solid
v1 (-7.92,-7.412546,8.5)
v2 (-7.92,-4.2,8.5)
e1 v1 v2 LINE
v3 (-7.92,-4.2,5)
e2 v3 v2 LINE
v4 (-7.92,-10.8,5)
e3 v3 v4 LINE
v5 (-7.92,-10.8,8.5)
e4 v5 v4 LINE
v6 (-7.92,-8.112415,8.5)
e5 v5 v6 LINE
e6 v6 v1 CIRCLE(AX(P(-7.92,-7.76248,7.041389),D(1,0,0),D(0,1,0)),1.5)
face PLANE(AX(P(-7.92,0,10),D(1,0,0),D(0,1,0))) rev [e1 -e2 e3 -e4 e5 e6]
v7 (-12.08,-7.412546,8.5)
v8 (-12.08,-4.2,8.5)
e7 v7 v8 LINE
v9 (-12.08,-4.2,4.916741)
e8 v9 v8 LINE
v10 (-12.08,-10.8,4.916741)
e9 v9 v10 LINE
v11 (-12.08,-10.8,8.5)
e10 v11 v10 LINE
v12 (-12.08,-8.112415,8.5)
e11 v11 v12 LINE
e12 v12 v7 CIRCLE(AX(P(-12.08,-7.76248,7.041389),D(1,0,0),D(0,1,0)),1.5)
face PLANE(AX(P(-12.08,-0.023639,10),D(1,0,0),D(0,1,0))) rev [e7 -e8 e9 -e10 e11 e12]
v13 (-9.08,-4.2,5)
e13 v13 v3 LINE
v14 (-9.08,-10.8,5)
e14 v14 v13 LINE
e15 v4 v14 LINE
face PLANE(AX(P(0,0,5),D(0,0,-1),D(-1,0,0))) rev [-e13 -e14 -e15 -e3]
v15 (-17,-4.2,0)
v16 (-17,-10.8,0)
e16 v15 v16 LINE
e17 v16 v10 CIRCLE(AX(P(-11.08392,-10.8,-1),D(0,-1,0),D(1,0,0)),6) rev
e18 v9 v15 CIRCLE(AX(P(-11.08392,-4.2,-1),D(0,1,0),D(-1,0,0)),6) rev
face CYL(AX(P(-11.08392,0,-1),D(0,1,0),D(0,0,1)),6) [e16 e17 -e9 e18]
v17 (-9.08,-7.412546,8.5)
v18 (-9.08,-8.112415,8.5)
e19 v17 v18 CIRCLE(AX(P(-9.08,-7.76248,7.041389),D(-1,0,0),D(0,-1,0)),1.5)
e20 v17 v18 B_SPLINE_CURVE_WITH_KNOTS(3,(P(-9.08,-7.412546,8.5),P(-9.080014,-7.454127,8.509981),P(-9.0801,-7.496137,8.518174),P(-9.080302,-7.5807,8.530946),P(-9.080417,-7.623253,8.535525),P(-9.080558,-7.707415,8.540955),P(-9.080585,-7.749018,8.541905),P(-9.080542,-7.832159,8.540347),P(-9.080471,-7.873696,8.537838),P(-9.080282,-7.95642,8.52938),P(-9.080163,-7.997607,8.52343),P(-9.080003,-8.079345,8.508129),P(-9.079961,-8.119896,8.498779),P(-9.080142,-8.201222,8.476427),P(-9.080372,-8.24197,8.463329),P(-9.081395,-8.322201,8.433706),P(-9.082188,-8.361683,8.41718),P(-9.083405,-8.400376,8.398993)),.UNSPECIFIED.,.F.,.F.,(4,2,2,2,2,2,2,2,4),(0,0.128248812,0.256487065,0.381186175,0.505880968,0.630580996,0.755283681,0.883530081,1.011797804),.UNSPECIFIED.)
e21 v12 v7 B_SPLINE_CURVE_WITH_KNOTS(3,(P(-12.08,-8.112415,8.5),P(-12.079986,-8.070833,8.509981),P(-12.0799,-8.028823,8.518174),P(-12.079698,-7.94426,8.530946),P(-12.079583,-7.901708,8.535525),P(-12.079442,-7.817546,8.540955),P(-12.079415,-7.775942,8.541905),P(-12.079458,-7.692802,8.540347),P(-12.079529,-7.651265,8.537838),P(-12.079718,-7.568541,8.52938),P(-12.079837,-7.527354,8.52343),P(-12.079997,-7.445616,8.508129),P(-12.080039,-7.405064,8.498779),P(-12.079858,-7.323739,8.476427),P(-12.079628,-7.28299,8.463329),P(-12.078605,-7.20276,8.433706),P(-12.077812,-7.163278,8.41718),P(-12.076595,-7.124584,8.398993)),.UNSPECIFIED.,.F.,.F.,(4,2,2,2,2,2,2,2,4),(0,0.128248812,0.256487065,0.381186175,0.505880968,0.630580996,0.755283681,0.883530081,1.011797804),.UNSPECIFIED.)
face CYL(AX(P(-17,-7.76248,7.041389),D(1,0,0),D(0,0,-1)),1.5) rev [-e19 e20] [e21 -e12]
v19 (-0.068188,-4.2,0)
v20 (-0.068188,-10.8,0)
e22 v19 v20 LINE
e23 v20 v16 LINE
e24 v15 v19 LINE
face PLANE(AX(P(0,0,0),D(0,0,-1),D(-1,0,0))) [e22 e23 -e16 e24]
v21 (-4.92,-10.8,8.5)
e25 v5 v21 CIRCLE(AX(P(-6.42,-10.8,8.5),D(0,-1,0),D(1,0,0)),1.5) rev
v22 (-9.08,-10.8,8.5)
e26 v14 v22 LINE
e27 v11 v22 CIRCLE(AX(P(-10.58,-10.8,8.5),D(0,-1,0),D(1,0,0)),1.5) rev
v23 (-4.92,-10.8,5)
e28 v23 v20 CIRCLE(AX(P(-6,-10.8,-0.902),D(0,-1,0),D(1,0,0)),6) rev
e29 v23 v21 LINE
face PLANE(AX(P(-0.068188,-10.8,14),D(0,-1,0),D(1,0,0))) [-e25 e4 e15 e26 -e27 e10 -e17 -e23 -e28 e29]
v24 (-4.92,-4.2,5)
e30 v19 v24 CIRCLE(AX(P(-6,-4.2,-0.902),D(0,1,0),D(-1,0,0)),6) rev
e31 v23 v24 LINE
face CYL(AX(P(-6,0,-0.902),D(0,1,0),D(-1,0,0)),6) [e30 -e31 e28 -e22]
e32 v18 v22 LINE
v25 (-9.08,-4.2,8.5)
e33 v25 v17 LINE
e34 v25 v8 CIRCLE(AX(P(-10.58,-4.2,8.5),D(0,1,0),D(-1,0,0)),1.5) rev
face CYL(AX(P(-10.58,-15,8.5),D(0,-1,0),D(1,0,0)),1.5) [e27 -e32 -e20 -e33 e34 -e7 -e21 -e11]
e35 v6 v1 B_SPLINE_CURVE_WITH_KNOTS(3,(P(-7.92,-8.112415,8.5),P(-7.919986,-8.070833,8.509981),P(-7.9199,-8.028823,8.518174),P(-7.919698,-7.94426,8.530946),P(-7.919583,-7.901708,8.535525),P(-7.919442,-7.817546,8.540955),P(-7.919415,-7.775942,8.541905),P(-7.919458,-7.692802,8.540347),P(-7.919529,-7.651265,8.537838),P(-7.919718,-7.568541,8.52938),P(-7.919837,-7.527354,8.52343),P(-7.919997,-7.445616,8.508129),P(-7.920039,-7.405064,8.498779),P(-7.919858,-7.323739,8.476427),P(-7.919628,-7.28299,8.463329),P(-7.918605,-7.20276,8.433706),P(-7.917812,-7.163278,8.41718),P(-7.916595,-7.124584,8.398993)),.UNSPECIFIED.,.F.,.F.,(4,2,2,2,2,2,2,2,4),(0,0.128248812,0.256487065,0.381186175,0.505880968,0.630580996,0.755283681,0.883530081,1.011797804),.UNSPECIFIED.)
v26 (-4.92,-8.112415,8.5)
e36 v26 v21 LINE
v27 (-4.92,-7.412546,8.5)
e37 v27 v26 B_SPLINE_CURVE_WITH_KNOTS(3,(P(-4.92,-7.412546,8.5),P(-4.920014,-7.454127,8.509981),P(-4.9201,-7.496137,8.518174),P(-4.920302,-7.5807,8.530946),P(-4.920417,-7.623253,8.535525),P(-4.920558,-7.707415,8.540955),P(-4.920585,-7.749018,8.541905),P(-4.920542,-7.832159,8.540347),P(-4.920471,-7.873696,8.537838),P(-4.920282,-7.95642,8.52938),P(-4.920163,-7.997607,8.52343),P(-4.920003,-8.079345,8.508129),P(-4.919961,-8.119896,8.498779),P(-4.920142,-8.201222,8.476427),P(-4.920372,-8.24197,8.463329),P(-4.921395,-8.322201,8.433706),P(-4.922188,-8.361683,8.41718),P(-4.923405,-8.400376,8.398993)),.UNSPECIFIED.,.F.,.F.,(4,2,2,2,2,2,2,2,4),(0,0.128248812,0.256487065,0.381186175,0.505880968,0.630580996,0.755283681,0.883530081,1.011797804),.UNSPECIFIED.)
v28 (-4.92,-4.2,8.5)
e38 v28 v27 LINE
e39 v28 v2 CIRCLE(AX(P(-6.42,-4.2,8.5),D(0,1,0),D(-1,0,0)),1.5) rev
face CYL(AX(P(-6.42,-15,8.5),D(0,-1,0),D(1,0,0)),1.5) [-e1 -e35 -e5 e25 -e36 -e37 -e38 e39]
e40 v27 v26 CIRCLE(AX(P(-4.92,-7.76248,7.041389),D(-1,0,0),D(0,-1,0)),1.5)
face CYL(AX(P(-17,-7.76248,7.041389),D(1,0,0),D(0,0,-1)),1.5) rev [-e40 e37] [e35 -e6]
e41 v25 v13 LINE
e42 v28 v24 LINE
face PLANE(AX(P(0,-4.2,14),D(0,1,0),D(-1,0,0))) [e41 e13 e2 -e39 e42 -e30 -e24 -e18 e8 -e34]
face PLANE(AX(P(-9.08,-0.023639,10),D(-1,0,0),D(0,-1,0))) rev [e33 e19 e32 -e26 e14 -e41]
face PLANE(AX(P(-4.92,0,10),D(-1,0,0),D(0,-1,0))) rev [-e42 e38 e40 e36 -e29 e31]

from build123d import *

# Parameters (mm, degrees)
SKETCH1_W               = 17
SKETCH1_H               = 15
BOSS_EXTRUDE1_DEPTH     = 5
SKETCH2_W               = 3
SKETCH2_H               = 15
SKETCH2_H_2             = 14.97636143
BOSS_EXTRUDE2_DEPTH     = 5
CUT_EXTRUDE2_DEPTH      = 21.185301583
CUT_EXTRUDE2_DEPTH_BACK = 21.185301583
SKETCH4_R               = 1.5
FILLET1_R               = 6
FILLET3_RADIUS          = 1.5
FILLET3_LENGTH          = 14.97636143
FILLET4_RADIUS          = 1.5
FILLET4_LENGTH          = 15
SKETCH5_W               = 17
SKETCH5_H               = 4.2
SKETCH5_W_2             = 16.931812254
CUT_EXTRUDE3_DEPTH      = 14


with BuildPart() as part:
    # Sketch1 → Boss-Extrude1 (new body)
    with BuildSketch(Plane.XY):
        with Locations((-8.5, -7.5)):
            Rectangle(SKETCH1_W, SKETCH1_H)
    extrude(amount=BOSS_EXTRUDE1_DEPTH)

    # Sketch2 → Boss-Extrude2 (add)
    with BuildSketch(Plane.XY.offset(5)):
        with Locations((-6.42, -7.5)):
            Rectangle(SKETCH2_W, SKETCH2_H)
        with Locations((-10.58, -7.511819285)):
            Rectangle(SKETCH2_W, SKETCH2_H_2)
    extrude(amount=BOSS_EXTRUDE2_DEPTH)

    # Sketch4 → Cut-Extrude2 (cut, two sides: drawn at the far end of the back side and taken through both)
    with BuildSketch(Plane(origin=(-9.08, 0, 0), x_dir=(0, 0, -1), z_dir=(1, 0, 0)).offset(-CUT_EXTRUDE2_DEPTH_BACK)):
        with Locations(Location((-7.041389116, -7.762480296, 0), (0, 0, 270))):
            Circle(SKETCH4_R)
    extrude(amount=CUT_EXTRUDE2_DEPTH + CUT_EXTRUDE2_DEPTH_BACK, mode=Mode.SUBTRACT)

    # Fillet1
    # the kernel refuses this fillet: 6 mm, written as the material it takes off along each edge
    with BuildSketch(Plane(origin=(0, -29.754999153, 5), x_dir=(0, 0, -1), z_dir=(0, 1, 0))) as fillet1_piece_1:
        with BuildLine():
            CenterArc((5.901999661, 6), FILLET1_R, 190.369759805, 79.630240195)
            Line((0, 4.92), (0, 0))
            Line((0, 0), (5.901999661, 0))
        make_face()
    extrude(amount=44.509998306, mode=Mode.SUBTRACT)
    # the kernel refuses this fillet: 6 mm, written as the material it takes off along each edge
    with BuildSketch(Plane(origin=(-17, 14.790199458, 5), x_dir=(0, 0, -1), z_dir=(0, -1, 0))) as fillet1_2_piece_1_section:
        with BuildLine():
            CenterArc((6, 5.916079783), FILLET1_R, 180, 80.405931773)
            Line((0, 5.916079783), (0, 0))
            Line((0, 0), (5, 0))
        make_face()
    fillet1_2_piece_1 = extrude(amount=44.580398916, mode=Mode.PRIVATE)
    fillet1_2_piece_1 = split(fillet1_2_piece_1, bisect_by=Plane(origin=(-17, -0.02363857, 5), z_dir=(0, 1, 0)), keep=Keep.TOP, mode=Mode.PRIVATE)
    fillet1_2_piece_1 = split(fillet1_2_piece_1, bisect_by=Plane(origin=(-12.08, 14.790199458, 5), z_dir=(-1, 0, 0)), keep=Keep.TOP, mode=Mode.PRIVATE)
    add(fillet1_2_piece_1, mode=Mode.SUBTRACT)
    with BuildSketch(Plane(origin=(-17, 14.790199458, 5), x_dir=(0, 0, -1), z_dir=(0, -1, 0))) as fillet1_2_piece_2_section:
        with BuildLine():
            CenterArc((6, 5.916079783), FILLET1_R, 180, 80.405931773)
            Line((0, 5.916079783), (0, 0))
            Line((0, 0), (5, 0))
        make_face()
    fillet1_2_piece_2 = extrude(amount=44.580398916, mode=Mode.PRIVATE)
    fillet1_2_piece_2 = split(fillet1_2_piece_2, bisect_by=Plane(origin=(-17, -0.02363857, 5), z_dir=(0, 1, 0)), keep=Keep.TOP, mode=Mode.PRIVATE)
    fillet1_2_piece_2 = split(fillet1_2_piece_2, bisect_by=Plane(origin=(-12.08, 14.790199458, 5), z_dir=(1, 0, 0)), keep=Keep.TOP, mode=Mode.PRIVATE)
    add(fillet1_2_piece_2, mode=Mode.SUBTRACT)
    with BuildSketch(Plane(origin=(-17, 14.790199458, 5), x_dir=(0, 0, -1), z_dir=(0, -1, 0))) as fillet1_2_piece_3_section:
        with BuildLine():
            CenterArc((6, 5.916079783), FILLET1_R, 180, 80.405931773)
            Line((0, 5.916079783), (0, 0))
            Line((0, 0), (5, 0))
        make_face()
    fillet1_2_piece_3 = extrude(amount=44.580398916, mode=Mode.PRIVATE)
    fillet1_2_piece_3 = split(fillet1_2_piece_3, bisect_by=Plane(origin=(-17, -0.02363857, 5), z_dir=(0, -1, 0)), keep=Keep.TOP, mode=Mode.PRIVATE)
    fillet1_2_piece_3 = split(fillet1_2_piece_3, bisect_by=Plane(origin=(-12.08, 14.790199458, 5), z_dir=(-1, 0, 0)), keep=Keep.TOP, mode=Mode.PRIVATE)
    add(fillet1_2_piece_3, mode=Mode.SUBTRACT)

    # Fillet3: full round fillet: the end face becomes a half cylinder, R = half its width
    fillet3_face = Plane((-10.58, -7.511819285, 10), x_dir=(0, -1, 0), z_dir=(0, 0, 1))  # on the end face: x along it, z out of the body
    fillet3_slab = fillet3_face.offset(-FILLET3_RADIUS / 2) * Box(FILLET3_LENGTH, 2 * FILLET3_RADIUS, FILLET3_RADIUS, mode=Mode.PRIVATE)  # the body's end, R deep
    fillet3_round = Plane((-10.58, -7.511819285, 8.5), x_dir=(0, 0, 1), z_dir=(0, -1, 0)) * Cylinder(FILLET3_RADIUS, FILLET3_LENGTH, mode=Mode.PRIVATE)  # its axis R under the face
    add(fillet3_slab - fillet3_round, mode=Mode.SUBTRACT)

    # Fillet4: full round fillet: the end face becomes a half cylinder, R = half its width
    fillet4_face = Plane((-6.42, -7.5, 10), x_dir=(0, -1, 0), z_dir=(0, 0, 1))  # on the end face: x along it, z out of the body
    fillet4_slab = fillet4_face.offset(-FILLET4_RADIUS / 2) * Box(FILLET4_LENGTH, 2 * FILLET4_RADIUS, FILLET4_RADIUS, mode=Mode.PRIVATE)  # the body's end, R deep
    fillet4_round = Plane((-6.42, -7.5, 8.5), x_dir=(0, 0, 1), z_dir=(0, -1, 0)) * Cylinder(FILLET4_RADIUS, FILLET4_LENGTH, mode=Mode.PRIVATE)  # its axis R under the face
    add(fillet4_slab - fillet4_round, mode=Mode.SUBTRACT)

    # Sketch5 → Cut-Extrude3 (cut)
    with BuildSketch(Plane.XY):
        with Locations((-8.5, -2.1)):
            Rectangle(SKETCH5_W, SKETCH5_H)
        with Locations((-8.534093873, -12.9)):
            Rectangle(SKETCH5_W_2, SKETCH5_H)
    extrude(amount=CUT_EXTRUDE3_DEPTH, mode=Mode.SUBTRACT)


solid = part.part
